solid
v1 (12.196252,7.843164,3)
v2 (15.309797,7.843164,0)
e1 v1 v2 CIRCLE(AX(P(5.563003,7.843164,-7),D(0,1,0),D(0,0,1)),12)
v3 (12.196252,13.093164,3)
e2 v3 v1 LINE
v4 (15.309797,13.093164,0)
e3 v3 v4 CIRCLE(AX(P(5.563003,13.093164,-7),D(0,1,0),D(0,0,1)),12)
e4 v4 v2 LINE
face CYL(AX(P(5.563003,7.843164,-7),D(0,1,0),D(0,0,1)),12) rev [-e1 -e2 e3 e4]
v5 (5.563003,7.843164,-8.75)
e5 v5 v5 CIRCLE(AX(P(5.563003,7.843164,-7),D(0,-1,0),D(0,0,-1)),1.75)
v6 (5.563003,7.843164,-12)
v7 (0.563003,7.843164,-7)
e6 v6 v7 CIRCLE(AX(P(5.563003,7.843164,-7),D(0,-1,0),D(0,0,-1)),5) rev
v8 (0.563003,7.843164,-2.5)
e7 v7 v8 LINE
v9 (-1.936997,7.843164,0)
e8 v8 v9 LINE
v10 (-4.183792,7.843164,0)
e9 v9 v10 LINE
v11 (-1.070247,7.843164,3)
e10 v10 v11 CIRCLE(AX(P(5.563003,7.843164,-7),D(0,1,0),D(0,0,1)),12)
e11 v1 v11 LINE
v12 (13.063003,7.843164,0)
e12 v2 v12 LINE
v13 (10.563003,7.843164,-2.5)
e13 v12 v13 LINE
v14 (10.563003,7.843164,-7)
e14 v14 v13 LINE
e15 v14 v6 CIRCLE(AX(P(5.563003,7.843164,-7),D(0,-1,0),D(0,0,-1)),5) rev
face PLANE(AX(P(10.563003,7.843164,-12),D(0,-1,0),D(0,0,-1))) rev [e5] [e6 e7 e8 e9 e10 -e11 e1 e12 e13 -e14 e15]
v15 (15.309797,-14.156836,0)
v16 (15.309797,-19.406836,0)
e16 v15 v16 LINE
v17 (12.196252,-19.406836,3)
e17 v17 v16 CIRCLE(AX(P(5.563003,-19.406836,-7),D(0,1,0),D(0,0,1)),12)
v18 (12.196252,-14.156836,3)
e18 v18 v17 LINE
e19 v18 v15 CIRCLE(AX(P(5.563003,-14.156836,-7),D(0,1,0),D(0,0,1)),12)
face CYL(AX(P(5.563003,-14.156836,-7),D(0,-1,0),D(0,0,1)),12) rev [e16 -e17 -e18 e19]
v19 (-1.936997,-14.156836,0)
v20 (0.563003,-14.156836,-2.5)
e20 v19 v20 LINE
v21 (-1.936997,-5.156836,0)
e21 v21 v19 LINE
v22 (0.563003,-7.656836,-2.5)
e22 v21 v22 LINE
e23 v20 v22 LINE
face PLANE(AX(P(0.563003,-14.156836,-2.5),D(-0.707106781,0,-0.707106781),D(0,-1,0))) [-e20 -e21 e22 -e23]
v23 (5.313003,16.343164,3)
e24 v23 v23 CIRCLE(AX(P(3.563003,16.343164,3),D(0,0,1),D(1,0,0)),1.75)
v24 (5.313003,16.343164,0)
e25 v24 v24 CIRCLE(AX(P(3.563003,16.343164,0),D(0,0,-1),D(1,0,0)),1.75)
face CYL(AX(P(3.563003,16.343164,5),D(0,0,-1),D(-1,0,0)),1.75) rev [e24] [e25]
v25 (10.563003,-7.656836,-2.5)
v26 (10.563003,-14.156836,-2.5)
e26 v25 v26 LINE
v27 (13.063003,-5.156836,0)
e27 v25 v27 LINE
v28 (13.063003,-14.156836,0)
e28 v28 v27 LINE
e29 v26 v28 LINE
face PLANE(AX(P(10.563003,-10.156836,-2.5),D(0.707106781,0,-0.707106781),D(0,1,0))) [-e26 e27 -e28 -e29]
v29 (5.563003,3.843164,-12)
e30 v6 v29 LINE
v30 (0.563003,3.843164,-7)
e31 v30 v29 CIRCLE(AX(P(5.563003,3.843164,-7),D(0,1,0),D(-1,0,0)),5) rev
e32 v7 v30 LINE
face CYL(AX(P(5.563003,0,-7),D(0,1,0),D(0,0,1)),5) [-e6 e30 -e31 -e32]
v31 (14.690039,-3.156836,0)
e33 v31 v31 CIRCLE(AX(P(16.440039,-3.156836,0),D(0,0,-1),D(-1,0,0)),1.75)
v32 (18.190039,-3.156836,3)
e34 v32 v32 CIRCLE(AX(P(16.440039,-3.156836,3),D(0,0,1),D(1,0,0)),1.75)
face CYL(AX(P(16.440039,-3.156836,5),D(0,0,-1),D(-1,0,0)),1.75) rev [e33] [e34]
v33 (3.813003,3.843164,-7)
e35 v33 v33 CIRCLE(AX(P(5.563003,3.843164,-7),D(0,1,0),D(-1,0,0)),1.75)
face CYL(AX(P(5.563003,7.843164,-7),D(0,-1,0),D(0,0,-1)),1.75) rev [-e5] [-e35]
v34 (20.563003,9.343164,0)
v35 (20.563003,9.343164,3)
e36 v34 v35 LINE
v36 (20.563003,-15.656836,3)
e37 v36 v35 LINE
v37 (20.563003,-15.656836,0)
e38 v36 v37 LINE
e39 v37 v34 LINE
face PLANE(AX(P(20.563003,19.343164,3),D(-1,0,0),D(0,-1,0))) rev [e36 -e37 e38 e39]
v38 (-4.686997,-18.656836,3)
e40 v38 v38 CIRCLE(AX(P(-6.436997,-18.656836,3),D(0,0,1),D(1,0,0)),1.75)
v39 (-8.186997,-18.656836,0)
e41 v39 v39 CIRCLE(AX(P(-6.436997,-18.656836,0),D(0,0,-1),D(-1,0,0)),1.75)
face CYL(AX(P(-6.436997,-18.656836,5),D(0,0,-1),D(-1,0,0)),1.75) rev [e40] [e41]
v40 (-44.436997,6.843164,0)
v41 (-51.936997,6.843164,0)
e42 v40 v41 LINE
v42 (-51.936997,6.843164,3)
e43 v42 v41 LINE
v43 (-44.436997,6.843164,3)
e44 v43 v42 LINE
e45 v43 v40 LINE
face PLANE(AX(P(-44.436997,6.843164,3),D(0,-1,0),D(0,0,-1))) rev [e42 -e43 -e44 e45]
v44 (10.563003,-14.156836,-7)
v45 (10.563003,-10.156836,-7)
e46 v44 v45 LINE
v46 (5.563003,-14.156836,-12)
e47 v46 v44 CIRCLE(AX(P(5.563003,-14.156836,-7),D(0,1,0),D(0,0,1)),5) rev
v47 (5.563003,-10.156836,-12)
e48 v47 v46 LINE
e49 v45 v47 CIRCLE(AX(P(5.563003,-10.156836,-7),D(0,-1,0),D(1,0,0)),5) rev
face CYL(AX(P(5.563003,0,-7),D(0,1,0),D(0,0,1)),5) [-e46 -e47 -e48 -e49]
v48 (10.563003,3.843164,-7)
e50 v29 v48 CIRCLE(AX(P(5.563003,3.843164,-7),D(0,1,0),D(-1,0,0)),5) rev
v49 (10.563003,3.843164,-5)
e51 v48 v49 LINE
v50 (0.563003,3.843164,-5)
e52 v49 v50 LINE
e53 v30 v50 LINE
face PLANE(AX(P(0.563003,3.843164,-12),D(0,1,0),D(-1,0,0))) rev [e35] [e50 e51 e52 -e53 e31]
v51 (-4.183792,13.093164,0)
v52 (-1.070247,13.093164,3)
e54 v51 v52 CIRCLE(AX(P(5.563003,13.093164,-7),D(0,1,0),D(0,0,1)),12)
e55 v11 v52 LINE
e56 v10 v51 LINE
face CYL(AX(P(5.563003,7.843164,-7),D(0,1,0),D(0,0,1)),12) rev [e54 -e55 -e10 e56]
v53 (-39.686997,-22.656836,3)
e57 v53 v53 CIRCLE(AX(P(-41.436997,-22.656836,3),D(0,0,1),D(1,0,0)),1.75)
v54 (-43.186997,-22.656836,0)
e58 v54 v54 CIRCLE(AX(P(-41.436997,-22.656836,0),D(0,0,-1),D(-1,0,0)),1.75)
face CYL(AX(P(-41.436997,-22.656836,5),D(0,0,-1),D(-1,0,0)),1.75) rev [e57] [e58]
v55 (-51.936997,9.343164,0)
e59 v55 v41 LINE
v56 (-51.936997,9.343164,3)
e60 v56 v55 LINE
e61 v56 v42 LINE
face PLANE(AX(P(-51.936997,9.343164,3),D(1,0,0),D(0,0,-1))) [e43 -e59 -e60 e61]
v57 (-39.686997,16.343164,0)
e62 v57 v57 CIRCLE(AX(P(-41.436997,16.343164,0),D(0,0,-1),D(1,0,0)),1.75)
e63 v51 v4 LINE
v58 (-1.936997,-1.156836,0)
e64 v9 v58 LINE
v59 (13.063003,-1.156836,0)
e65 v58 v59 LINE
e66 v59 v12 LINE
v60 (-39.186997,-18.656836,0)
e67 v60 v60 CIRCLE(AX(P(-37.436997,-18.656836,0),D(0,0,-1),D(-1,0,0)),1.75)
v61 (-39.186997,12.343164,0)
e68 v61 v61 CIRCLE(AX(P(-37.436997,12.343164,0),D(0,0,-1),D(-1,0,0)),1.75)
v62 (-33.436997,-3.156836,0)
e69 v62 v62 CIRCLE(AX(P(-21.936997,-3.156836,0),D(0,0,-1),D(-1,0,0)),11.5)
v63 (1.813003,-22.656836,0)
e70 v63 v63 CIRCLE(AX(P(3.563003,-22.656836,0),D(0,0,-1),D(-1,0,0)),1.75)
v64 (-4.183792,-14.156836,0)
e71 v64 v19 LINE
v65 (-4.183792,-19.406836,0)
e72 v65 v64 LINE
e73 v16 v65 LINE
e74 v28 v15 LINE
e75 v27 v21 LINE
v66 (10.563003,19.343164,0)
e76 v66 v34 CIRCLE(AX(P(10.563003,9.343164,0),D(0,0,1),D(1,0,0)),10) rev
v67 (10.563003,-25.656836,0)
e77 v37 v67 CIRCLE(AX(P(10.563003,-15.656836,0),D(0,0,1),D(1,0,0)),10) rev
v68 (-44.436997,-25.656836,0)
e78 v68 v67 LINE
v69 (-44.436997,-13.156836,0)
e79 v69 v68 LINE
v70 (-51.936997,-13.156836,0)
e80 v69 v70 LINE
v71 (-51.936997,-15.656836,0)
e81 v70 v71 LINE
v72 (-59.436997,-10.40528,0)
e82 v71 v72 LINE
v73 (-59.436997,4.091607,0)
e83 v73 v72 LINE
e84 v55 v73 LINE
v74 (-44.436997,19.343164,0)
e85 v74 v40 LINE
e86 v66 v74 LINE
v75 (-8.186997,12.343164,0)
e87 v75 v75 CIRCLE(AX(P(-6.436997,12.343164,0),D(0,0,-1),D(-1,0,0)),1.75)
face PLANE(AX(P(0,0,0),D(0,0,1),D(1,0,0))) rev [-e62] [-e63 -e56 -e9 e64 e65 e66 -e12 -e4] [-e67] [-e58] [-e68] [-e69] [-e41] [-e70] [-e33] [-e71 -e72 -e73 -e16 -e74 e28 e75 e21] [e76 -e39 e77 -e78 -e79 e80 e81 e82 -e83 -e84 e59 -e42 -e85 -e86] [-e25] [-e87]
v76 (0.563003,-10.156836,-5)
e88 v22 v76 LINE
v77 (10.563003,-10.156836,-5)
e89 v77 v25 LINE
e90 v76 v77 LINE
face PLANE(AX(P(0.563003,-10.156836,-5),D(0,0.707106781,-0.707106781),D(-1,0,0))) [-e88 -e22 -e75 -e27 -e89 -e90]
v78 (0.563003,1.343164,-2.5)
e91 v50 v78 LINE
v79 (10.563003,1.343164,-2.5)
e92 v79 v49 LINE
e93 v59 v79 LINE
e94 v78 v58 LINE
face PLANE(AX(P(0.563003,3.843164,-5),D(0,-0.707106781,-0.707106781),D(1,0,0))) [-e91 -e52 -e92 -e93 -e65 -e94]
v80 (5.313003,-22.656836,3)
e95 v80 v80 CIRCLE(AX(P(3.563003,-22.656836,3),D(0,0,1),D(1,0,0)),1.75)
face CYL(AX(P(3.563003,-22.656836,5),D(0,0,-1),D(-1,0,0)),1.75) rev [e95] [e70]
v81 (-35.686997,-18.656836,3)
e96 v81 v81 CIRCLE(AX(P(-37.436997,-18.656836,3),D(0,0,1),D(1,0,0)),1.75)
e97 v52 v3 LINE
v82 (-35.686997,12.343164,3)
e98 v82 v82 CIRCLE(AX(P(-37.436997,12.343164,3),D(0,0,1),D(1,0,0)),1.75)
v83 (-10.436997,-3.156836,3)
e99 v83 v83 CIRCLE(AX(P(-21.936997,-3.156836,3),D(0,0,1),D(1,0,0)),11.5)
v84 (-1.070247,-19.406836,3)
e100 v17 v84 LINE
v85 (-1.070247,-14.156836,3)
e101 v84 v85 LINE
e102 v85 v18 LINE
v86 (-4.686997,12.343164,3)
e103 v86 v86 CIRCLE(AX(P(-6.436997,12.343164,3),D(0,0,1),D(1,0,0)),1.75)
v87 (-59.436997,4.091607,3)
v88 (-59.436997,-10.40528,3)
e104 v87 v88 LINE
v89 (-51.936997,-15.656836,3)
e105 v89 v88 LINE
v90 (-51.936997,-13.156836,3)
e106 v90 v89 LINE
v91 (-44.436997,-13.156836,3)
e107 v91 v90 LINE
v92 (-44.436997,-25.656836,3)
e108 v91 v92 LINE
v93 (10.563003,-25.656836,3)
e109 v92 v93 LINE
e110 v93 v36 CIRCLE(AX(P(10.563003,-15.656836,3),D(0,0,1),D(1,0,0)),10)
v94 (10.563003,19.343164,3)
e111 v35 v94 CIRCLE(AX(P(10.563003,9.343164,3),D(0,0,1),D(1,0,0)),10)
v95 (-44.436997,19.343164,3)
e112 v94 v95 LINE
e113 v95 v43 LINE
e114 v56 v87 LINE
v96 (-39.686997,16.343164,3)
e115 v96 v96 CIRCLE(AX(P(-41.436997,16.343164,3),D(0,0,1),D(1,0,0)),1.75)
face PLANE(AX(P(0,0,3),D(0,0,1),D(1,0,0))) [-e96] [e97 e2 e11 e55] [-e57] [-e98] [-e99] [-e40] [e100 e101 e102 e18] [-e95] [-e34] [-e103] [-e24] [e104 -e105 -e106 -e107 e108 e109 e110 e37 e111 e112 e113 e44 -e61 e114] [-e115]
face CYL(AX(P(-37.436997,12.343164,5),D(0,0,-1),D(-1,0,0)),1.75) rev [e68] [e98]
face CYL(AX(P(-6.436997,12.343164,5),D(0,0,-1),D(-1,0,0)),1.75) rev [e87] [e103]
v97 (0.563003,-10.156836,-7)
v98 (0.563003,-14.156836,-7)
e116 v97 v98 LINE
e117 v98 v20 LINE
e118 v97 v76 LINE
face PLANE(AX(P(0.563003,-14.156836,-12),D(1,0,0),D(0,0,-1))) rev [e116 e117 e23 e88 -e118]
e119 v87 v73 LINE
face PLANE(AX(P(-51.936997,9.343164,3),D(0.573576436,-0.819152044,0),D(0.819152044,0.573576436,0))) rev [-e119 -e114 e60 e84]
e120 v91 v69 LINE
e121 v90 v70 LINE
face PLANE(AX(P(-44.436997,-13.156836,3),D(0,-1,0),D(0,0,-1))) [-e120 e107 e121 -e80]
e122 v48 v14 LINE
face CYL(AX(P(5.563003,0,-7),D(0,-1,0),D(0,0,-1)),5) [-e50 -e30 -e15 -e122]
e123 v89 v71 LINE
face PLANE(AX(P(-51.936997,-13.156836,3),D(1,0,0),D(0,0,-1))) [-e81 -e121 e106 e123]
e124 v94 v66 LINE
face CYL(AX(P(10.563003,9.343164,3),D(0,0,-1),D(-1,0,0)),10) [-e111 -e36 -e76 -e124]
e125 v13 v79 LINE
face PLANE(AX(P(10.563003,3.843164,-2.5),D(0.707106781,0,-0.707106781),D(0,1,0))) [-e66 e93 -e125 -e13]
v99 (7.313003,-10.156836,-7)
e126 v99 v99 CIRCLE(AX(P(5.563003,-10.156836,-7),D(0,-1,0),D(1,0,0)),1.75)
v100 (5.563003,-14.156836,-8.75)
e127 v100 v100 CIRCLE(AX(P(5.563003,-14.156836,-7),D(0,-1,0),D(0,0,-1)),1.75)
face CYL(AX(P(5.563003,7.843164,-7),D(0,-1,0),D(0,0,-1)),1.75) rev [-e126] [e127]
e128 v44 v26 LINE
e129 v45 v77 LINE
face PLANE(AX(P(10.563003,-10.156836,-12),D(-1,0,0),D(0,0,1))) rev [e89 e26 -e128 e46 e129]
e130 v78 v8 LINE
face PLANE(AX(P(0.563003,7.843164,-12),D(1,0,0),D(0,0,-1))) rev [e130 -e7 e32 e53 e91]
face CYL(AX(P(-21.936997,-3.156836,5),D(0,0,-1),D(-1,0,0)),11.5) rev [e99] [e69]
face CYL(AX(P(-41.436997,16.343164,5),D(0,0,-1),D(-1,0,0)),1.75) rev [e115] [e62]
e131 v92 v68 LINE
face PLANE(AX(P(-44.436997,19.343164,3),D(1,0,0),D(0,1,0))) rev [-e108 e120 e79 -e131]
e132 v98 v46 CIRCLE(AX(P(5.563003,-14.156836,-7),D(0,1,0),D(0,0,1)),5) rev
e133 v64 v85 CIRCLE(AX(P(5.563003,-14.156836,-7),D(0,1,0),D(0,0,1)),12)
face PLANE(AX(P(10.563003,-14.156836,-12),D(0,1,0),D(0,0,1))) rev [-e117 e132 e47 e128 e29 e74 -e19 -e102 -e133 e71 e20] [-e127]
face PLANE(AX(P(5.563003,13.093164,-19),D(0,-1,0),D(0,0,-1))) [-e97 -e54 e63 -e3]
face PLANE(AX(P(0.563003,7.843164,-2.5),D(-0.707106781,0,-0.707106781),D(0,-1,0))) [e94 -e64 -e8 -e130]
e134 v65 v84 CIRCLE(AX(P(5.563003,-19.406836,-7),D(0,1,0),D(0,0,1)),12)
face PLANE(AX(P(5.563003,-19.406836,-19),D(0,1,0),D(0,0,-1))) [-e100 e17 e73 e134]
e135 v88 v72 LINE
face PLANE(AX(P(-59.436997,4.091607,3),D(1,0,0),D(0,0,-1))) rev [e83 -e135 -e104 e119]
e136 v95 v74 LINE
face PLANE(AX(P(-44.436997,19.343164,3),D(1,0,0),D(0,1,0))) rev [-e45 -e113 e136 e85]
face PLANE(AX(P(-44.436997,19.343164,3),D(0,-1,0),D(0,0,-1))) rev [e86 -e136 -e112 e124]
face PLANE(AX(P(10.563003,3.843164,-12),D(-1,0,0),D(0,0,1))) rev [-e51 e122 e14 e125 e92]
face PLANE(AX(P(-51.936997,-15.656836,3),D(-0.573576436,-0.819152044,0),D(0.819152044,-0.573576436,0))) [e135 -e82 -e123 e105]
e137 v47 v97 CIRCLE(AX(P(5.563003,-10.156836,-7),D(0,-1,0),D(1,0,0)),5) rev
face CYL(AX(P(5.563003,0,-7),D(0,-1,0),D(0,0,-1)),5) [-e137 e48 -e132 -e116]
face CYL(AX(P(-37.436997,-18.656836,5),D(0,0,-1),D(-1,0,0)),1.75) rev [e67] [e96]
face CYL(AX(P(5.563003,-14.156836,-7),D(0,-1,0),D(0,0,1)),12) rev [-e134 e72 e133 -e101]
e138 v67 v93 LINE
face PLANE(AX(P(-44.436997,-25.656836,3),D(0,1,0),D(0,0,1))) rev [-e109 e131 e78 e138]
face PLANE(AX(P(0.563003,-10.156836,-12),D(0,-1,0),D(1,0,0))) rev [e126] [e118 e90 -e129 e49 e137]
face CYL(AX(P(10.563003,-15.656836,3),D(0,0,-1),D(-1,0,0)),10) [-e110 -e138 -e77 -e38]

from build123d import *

# Parameters (mm, degrees)
SKETCH1_W           = 65
SKETCH1_H           = 45
BOSS_EXTRUDE1_DEPTH = 3
FILLET4_R           = 10
BOSS_EXTRUDE4_DEPTH = 3
SKETCH9_R           = 1.75
CUT_EXTRUDE5_DEPTH  = 5
SKETCH10_R          = 1.75
SKETCH10_R_2        = 11.5
CUT_EXTRUDE6_DEPTH  = 5
SKETCH2_W           = 10
SKETCH2_H           = 4
BOSS_EXTRUDE5_DEPTH = 12
SKETCH11_R          = 1.75
CUT_EXTRUDE7_DEPTH  = 22
CHAMFER3_SIZE       = 2.5
CHAMFER4_SIZE       = 5
FILLET5_R           = 5
SKETCH13_W          = 12
SKETCH13_H          = 5.25


with BuildPart() as part:
    # Sketch1 → Boss-Extrude1 (new body)
    with BuildSketch(Plane.XY):
        with Locations((-11.936997319, -3.156836461)):
            Rectangle(SKETCH1_W, SKETCH1_H)
    extrude(amount=BOSS_EXTRUDE1_DEPTH)

    # Fillet4
    fillet4_edges = [part.edges().sort_by_distance(p)[0] for p in [
        (20.563002681, 19.343163539, 1.5),
        (20.563002681, -25.656836461, 1.5),
    ]]
    fillet(fillet4_edges, radius=FILLET4_R)

    # Sketch8 → Boss-Extrude4 (add)
    with BuildSketch(Plane(origin=(0, 0, 0), x_dir=(-1, 0, 0), z_dir=(0, 0, -1))):
        Polygon((44.436997319, 6.843163539), (51.936997319, 6.843163539), (51.936997319, 9.343163539), (59.436997319, 4.091607002), (59.436997319, -10.405279925), (51.936997319, -15.656836461), (51.936997319, -13.156836461), (44.436997319, -13.156836461), align=None)
    extrude(amount=-BOSS_EXTRUDE4_DEPTH)

    # Sketch9 → Cut-Extrude5 (cut)
    with BuildSketch(Plane(origin=(0, 0, 0), x_dir=(-1, 0, 0), z_dir=(0, 0, -1))):
        with Locations((-16.440039295, -3.156836461)):
            Circle(SKETCH9_R)
        with Locations((-3.563002681, -22.656836461)):
            Circle(SKETCH9_R)
        with Locations((41.436997319, -22.656836461)):
            Circle(SKETCH9_R)
        with Locations(Location((41.436997319, 16.343163539, 0), (0, 0, 180))):
            Circle(SKETCH9_R)
        with Locations(Location((-3.563002681, 16.343163539, 0), (0, 0, 180))):
            Circle(SKETCH9_R)
    extrude(amount=-CUT_EXTRUDE5_DEPTH, mode=Mode.SUBTRACT)

    # Sketch10 → Cut-Extrude6 (cut)
    with BuildSketch(Plane(origin=(0, 0, 0), x_dir=(-1, 0, 0), z_dir=(0, 0, -1))):
        with Locations((6.436997319, -18.656836461)):
            Circle(SKETCH10_R)
        with Locations((37.436997319, 12.343163539)):
            Circle(SKETCH10_R)
        with Locations((6.436997319, 12.343163539)):
            Circle(SKETCH10_R)
        with Locations((37.436997319, -18.656836461)):
            Circle(SKETCH10_R)
        with Locations((21.936997319, -3.156836461)):
            Circle(SKETCH10_R_2)
    extrude(amount=-CUT_EXTRUDE6_DEPTH, mode=Mode.SUBTRACT)

    # Sketch2 → Boss-Extrude5 (add)
    with BuildSketch(Plane(origin=(0, 0, 0), x_dir=(-1, 0, 0), z_dir=(0, 0, -1))):
        with Locations((-5.563002681, 5.843163539)):
            Rectangle(SKETCH2_W, SKETCH2_H)
        with Locations((-5.563002681, -12.156836461)):
            Rectangle(SKETCH2_W, SKETCH2_H)
    extrude(amount=BOSS_EXTRUDE5_DEPTH)

    # Sketch11 → Cut-Extrude7 (cut)
    with BuildSketch(Plane.XZ.offset(14.156836461)):
        with Locations(Location((5.563002681, -7, 0), (0, 0, 270))):
            Circle(SKETCH11_R)
    extrude(amount=-CUT_EXTRUDE7_DEPTH, mode=Mode.SUBTRACT)

    # Chamfer3
    chamfer3_edges = [part.edges().sort_by_distance(p)[0] for p in [
        (10.563002681, -12.156836461, 0),
        (0.563002681, -12.156836461, 0),
        (0.563002681, 5.843163539, 0),
        (10.563002681, 5.843163539, 0),
    ]]
    chamfer(chamfer3_edges, length=CHAMFER3_SIZE)

    # Chamfer4
    chamfer4_edges = [part.edges().sort_by_distance(p)[0] for p in [
        (5.563002681, -10.156836461, 0),
        (5.563002681, 3.843163539, 0),
    ]]
    chamfer(chamfer4_edges, length=CHAMFER4_SIZE)

    # Fillet5
    fillet5_edges = [part.edges().sort_by_distance(p)[0] for p in [
        (0.563002681, -12.156836461, -12),
        (10.563002681, -12.156836461, -12),
        (0.563002681, 5.843163539, -12),
        (10.563002681, 5.843163539, -12),
    ]]
    fillet(fillet5_edges, radius=FILLET5_R - 0.0001)  # a hair under: the kernel refuses the full size

    # Sketch13 → Cut-Revolve1 (revolve, cut)
    with BuildSketch(Plane(origin=(5.563002681, 0, 0), x_dir=(0, 0, -1), z_dir=(1, 0, 0))):
        with Locations((13, 10.468163539)):
            Rectangle(SKETCH13_W, SKETCH13_H)
    cut_revolve1 = revolve(axis=Axis((5.563002681, 7.843163539, -7), (0, -1, 0)), mode=Mode.SUBTRACT)

    # Mirror1: Cut-Revolve1 across plane
    add(cut_revolve1.mirror(Plane.ZX.offset(-3.156836461)), mode=Mode.SUBTRACT)


solid = part.part
